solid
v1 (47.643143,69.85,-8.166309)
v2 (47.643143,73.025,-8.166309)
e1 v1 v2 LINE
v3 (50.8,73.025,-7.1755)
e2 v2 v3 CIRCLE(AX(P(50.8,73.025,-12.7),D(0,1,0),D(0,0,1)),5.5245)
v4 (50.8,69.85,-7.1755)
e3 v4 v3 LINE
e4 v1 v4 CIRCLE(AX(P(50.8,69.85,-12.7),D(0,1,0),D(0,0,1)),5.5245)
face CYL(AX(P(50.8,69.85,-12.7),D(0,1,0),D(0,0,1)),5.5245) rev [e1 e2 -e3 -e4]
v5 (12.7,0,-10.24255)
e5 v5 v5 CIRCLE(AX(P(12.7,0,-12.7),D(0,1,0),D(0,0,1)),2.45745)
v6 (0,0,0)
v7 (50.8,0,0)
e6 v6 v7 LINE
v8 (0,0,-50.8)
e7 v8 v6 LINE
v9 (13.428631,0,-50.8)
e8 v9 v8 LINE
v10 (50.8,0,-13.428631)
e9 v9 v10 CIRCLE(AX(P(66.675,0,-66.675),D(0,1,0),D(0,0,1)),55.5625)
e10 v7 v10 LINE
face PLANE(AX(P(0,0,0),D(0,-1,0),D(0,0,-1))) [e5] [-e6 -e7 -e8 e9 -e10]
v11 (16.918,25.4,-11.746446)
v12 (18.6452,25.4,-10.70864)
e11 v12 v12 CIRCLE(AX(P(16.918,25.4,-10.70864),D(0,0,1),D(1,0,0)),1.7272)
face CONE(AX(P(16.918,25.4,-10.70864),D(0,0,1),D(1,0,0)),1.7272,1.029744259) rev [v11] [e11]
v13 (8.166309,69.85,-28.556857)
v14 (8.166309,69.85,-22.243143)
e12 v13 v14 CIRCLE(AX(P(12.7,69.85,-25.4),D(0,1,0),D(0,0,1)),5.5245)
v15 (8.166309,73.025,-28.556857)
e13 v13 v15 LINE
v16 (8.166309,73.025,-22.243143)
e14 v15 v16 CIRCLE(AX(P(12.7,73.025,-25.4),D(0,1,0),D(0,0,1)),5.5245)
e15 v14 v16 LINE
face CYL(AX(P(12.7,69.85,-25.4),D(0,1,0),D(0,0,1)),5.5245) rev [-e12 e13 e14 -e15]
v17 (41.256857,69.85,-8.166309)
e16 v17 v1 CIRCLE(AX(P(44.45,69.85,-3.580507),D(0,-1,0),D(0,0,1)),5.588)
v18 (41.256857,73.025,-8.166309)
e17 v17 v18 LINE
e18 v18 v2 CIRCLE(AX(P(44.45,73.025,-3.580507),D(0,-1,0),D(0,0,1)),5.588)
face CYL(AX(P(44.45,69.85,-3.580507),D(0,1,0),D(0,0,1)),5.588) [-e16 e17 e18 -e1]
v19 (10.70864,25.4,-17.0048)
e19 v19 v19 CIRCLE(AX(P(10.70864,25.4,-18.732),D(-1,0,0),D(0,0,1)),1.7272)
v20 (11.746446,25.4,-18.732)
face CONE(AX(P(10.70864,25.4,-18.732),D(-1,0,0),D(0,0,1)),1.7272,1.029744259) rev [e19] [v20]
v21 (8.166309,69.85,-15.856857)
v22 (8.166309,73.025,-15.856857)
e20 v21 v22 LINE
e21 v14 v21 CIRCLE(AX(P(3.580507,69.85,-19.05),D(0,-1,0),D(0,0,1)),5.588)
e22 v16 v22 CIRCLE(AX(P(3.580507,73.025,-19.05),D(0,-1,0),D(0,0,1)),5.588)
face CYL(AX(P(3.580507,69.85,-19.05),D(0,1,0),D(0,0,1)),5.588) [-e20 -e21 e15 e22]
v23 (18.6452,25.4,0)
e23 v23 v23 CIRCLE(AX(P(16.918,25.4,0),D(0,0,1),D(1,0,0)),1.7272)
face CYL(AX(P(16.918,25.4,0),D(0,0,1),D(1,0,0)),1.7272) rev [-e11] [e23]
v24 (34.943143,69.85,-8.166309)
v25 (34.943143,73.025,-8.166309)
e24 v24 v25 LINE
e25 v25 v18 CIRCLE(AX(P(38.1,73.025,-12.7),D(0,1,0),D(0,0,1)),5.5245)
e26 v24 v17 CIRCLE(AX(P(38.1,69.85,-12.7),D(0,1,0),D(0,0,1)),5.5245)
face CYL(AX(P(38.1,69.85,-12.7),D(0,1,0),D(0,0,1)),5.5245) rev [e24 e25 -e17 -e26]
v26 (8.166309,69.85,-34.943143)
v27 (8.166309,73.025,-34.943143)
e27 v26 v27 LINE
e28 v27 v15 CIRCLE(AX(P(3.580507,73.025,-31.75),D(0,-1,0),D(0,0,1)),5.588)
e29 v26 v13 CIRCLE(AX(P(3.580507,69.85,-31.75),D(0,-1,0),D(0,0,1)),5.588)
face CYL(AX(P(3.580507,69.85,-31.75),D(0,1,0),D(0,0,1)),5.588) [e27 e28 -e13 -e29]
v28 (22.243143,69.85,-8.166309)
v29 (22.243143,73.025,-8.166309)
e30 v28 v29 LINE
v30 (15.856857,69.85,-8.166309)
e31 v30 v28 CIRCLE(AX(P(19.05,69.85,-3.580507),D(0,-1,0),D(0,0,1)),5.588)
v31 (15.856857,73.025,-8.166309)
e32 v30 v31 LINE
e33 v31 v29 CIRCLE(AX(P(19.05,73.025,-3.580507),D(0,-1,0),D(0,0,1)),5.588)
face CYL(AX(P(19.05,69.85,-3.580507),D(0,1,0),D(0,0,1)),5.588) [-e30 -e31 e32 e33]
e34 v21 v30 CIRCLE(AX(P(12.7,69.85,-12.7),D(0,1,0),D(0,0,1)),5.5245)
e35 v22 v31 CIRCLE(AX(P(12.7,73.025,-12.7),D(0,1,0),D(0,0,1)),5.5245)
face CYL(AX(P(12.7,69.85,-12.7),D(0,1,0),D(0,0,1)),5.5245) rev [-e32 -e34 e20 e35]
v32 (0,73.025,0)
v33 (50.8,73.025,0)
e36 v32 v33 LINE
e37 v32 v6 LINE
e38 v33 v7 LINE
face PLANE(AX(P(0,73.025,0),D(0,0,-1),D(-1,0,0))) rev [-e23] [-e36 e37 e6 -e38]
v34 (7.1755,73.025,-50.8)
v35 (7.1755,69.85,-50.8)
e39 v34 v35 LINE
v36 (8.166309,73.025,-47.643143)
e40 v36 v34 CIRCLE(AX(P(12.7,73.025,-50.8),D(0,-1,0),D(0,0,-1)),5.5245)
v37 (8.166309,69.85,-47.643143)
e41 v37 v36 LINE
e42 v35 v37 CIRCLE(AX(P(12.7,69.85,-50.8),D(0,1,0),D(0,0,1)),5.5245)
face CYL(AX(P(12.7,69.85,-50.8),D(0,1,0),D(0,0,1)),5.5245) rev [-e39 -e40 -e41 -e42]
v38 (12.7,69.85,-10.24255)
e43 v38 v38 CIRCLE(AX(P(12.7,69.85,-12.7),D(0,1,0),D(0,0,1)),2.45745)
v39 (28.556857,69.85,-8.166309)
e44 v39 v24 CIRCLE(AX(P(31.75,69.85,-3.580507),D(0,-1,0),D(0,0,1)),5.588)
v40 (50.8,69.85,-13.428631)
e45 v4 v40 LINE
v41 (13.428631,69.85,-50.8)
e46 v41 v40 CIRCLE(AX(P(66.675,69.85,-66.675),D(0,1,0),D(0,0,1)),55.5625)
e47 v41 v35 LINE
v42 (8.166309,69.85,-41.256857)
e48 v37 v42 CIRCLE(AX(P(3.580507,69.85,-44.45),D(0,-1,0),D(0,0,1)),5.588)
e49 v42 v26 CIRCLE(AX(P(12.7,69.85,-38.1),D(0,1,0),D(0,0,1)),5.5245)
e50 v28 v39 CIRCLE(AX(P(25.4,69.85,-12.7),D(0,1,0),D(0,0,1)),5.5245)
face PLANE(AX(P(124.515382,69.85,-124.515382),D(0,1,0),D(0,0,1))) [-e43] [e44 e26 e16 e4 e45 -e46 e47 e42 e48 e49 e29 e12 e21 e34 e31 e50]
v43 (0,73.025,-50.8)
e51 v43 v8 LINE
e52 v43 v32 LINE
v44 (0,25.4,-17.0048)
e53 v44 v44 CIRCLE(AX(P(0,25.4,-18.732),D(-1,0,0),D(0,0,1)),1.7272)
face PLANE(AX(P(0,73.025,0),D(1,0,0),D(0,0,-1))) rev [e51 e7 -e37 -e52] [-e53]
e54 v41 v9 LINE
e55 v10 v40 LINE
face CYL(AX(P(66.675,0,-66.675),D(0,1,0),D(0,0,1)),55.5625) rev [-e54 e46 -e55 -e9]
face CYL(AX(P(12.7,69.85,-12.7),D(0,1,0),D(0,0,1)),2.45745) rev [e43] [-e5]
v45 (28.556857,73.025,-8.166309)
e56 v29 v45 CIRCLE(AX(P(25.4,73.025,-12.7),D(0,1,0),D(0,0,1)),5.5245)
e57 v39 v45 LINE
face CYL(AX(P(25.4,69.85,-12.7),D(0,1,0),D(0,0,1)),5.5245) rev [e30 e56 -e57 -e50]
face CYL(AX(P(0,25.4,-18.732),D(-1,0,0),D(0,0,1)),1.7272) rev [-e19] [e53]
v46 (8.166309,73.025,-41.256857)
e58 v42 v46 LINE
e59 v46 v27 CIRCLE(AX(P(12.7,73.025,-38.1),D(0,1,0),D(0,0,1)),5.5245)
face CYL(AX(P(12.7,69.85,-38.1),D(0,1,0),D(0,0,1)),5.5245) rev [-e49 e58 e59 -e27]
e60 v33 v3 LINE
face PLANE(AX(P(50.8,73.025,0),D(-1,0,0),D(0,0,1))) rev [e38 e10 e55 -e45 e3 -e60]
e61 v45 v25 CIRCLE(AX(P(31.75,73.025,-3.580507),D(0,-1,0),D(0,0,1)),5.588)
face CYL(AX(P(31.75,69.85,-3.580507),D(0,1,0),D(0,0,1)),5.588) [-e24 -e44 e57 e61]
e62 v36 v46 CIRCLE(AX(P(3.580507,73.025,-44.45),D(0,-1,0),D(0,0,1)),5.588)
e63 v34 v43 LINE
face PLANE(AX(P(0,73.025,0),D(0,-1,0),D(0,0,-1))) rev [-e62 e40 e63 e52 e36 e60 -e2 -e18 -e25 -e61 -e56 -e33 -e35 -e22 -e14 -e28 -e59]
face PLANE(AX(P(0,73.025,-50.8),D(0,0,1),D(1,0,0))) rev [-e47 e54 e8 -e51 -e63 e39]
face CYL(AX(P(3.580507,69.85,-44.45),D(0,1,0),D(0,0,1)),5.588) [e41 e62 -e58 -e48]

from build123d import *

# Parameters (mm, degrees)
SKETCH1_W                            = 50.8
SKETCH1_H                            = 50.8
BOSS_EXTRUDE1_DEPTH                  = 73.025
CUT_EXTRUDE1_DEPTH                   = 3.175
SKETCH3_R                            = 55.5625
CUT_EXTRUDE2_DEPTH                   = 103.439887861
F_8_32_TAPPED_HOLE1_D                = 3.4544
F_8_32_TAPPED_HOLE1_DEPTH            = 10.70864
F_8_32_TAPPED_HOLE1_TIP              = 1.037806461
F_8_32_TAPPED_HOLE2_D                = 3.4544
F_8_32_TAPPED_HOLE2_DEPTH            = 10.70864
F_8_32_TAPPED_HOLE2_TIP              = 1.037806461
F_10_0_1935_DIAMETER_HOLE1_OUTLINE_R = 2.45745
F_10_0_1935_DIAMETER_HOLE1_DEPTH     = 69.85


# Read off the part's stored shape, not the designer's step: #10 (0.1935) Diameter Hole1
with BuildPart() as part:
    # Sketch1 → Boss-Extrude1 (new body)
    with BuildSketch(Plane(origin=(0, 0, 0), x_dir=(1, 0, 0), z_dir=(0, 1, 0))):
        with Locations((25.4, 25.4)):
            Rectangle(SKETCH1_W, SKETCH1_H)
    extrude(amount=BOSS_EXTRUDE1_DEPTH)

    # Sketch2 → Cut-Extrude1 (cut)
    with BuildSketch(Plane(origin=(0, 73.025, 0), x_dir=(1, 0, 0), z_dir=(0, 1, 0))):
        with BuildLine():
            Line((130.016993909, 125.017737196), (134.25782275, 78.573759143))
            ThreePointArc((134.25782275, 78.573759143), (134.034685181, 75.298190088), (132.798116214, 72.256802214))
            ThreePointArc((132.798116214, 72.256802214), (130.01096738, 66.280890285), (128.580118229, 59.844090402))
            ThreePointArc((128.580118229, 59.844090402), (125.846501332, 47.24207899), (120.576283082, 35.473130329))
            ThreePointArc((120.576283082, 35.473130329), (120.013426501, 34.114565768), (119.824473194, 32.656209898))
            ThreePointArc((119.824473194, 32.656209898), (117.90735564, 28.45485307), (113.469501546, 27.177281171))
            ThreePointArc((113.469501546, 27.177281171), (106.116591491, 23.83727612), (106.198458812, 15.761744078))
            ThreePointArc((106.198458812, 15.761744078), (105.465515747, 8.75311664), (98.443142857, 8.166309094))
            ThreePointArc((98.443142857, 8.166309094), (95.25, 9.168506799), (92.056857143, 8.166309094))
            ThreePointArc((92.056857143, 8.166309094), (88.9, 7.1755), (85.743142857, 8.166309094))
            ThreePointArc((85.743142857, 8.166309094), (82.55, 9.168506799), (79.356857143, 8.166309094))
            ThreePointArc((79.356857143, 8.166309094), (76.212257074, 7.175513597), (73.063291467, 8.152345678))
            ThreePointArc((73.063291467, 8.152345678), (69.907489389, 9.140393728), (66.74574768, 8.171520637))
            ThreePointArc((66.74574768, 8.171520637), (63.508942298, 7.175501389), (60.273525168, 8.176020964))
            ThreePointArc((60.273525168, 8.176020964), (57.10532095, 9.149271709), (53.943097961, 8.156759366))
            ThreePointArc((53.943097961, 8.156759366), (50.791625748, 7.175506347), (47.643142857, 8.166309094))
            ThreePointArc((47.643142857, 8.166309094), (44.45, 9.168506799), (41.256857143, 8.166309094))
            ThreePointArc((41.256857143, 8.166309094), (38.1, 7.1755), (34.943142857, 8.166309094))
            ThreePointArc((34.943142857, 8.166309094), (31.75, 9.168506799), (28.556857143, 8.166309094))
            ThreePointArc((28.556857143, 8.166309094), (25.4, 7.1755), (22.243142857, 8.166309094))
            ThreePointArc((22.243142857, 8.166309094), (19.05, 9.168506799), (15.856857143, 8.166309094))
            ThreePointArc((15.856857143, 8.166309094), (8.793588587, 8.793588587), (8.166309094, 15.856857143))
            ThreePointArc((8.166309094, 15.856857143), (9.168506799, 19.05), (8.166309094, 22.243142857))
            ThreePointArc((8.166309094, 22.243142857), (7.1755, 25.4), (8.166309094, 28.556857143))
            ThreePointArc((8.166309094, 28.556857143), (9.168506799, 31.75), (8.166309094, 34.943142857))
            ThreePointArc((8.166309094, 34.943142857), (7.1755, 38.1), (8.166309094, 41.256857143))
            ThreePointArc((8.166309094, 41.256857143), (9.168506799, 44.45), (8.166309094, 47.643142857))
            ThreePointArc((8.166309094, 47.643142857), (7.175506347, 50.791625748), (8.156759366, 53.943097961))
            ThreePointArc((8.156759366, 53.943097961), (9.149271709, 57.10532095), (8.176020964, 60.273525168))
            ThreePointArc((8.176020964, 60.273525168), (7.175501389, 63.508942298), (8.171520637, 66.74574768))
            ThreePointArc((8.171520637, 66.74574768), (9.140393728, 69.907489389), (8.152345678, 73.063291467))
            ThreePointArc((8.152345678, 73.063291467), (7.175513597, 76.212257074), (8.166309094, 79.356857143))
            ThreePointArc((8.166309094, 79.356857143), (9.168506799, 82.55), (8.166309094, 85.743142857))
            ThreePointArc((8.166309094, 85.743142857), (7.1755, 88.9), (8.166309094, 92.056857143))
            ThreePointArc((8.166309094, 92.056857143), (9.168506799, 95.25), (8.166309094, 98.443142857))
            ThreePointArc((8.166309094, 98.443142857), (8.75311664, 105.465515747), (15.761744078, 106.198458812))
            ThreePointArc((15.761744078, 106.198458812), (23.83727612, 106.116591491), (27.177281171, 113.469501546))
            ThreePointArc((27.177281171, 113.469501546), (28.45485307, 117.90735564), (32.656209898, 119.824473194))
            ThreePointArc((32.656209898, 119.824473194), (34.114565768, 120.013426501), (35.473130329, 120.576283082))
            ThreePointArc((35.473130329, 120.576283082), (47.24207899, 125.846501332), (59.844090402, 128.580118229))
            ThreePointArc((59.844090402, 128.580118229), (68.705211612, 130.952457845), (76.452938417, 135.863689229))
            ThreePointArc((76.452938417, 135.863689229), (80.625736152, 138.0725352), (85.345346996, 138.201045691))
            Line((85.345346996, 138.201045691), (125.626948268, 129.926898817))
            ThreePointArc((125.626948268, 129.926898817), (128.63345164, 128.197989094), (130.016993909, 125.017737196))
        make_face()
    extrude(amount=-CUT_EXTRUDE1_DEPTH, mode=Mode.SUBTRACT)

    # Sketch3 → Cut-Extrude2 (cut, through all)
    with BuildSketch(Plane(origin=(0, 73.025, 0), x_dir=(1, 0, 0), z_dir=(0, 1, 0))):
        with Locations((66.675, 66.675)):
            Circle(SKETCH3_R)
    extrude(amount=-CUT_EXTRUDE2_DEPTH, mode=Mode.SUBTRACT)

    # #8-32 Tapped Hole1
    with Locations(Plane(origin=(393.7, -15.875, 0), x_dir=(1, 0, 0), z_dir=(0, 0, 1))):
        with Locations((-376.782, 41.275)):
            Hole(F_8_32_TAPPED_HOLE1_D / 2, depth=F_8_32_TAPPED_HOLE1_DEPTH)
            with Locations((0, 0, -(F_8_32_TAPPED_HOLE1_DEPTH + F_8_32_TAPPED_HOLE1_TIP / 2))):  # 118° drill point
                Cone(0, F_8_32_TAPPED_HOLE1_D / 2, F_8_32_TAPPED_HOLE1_TIP, mode=Mode.SUBTRACT)

    # #8-32 Tapped Hole2
    with Locations(Plane(origin=(0, -15.875, -393.7), x_dir=(0, 0, 1), z_dir=(-1, 0, 0))):
        with Locations((374.968, 41.275)):
            Hole(F_8_32_TAPPED_HOLE2_D / 2, depth=F_8_32_TAPPED_HOLE2_DEPTH)
            with Locations((0, 0, -(F_8_32_TAPPED_HOLE2_DEPTH + F_8_32_TAPPED_HOLE2_TIP / 2))):  # 118° drill point
                Cone(0, F_8_32_TAPPED_HOLE2_D / 2, F_8_32_TAPPED_HOLE2_TIP, mode=Mode.SUBTRACT)

    # #10 (0.1935) Diameter Hole1 outline → #10 (0.1935) Diameter Hole1 (cut)
    with BuildSketch(Plane(origin=(0, 0, 0), x_dir=(1, 0, 0), z_dir=(0, 1, 0))):
        with Locations((12.7, 12.7)):
            Circle(F_10_0_1935_DIAMETER_HOLE1_OUTLINE_R)
    extrude(amount=F_10_0_1935_DIAMETER_HOLE1_DEPTH, mode=Mode.SUBTRACT)


solid = part.part
